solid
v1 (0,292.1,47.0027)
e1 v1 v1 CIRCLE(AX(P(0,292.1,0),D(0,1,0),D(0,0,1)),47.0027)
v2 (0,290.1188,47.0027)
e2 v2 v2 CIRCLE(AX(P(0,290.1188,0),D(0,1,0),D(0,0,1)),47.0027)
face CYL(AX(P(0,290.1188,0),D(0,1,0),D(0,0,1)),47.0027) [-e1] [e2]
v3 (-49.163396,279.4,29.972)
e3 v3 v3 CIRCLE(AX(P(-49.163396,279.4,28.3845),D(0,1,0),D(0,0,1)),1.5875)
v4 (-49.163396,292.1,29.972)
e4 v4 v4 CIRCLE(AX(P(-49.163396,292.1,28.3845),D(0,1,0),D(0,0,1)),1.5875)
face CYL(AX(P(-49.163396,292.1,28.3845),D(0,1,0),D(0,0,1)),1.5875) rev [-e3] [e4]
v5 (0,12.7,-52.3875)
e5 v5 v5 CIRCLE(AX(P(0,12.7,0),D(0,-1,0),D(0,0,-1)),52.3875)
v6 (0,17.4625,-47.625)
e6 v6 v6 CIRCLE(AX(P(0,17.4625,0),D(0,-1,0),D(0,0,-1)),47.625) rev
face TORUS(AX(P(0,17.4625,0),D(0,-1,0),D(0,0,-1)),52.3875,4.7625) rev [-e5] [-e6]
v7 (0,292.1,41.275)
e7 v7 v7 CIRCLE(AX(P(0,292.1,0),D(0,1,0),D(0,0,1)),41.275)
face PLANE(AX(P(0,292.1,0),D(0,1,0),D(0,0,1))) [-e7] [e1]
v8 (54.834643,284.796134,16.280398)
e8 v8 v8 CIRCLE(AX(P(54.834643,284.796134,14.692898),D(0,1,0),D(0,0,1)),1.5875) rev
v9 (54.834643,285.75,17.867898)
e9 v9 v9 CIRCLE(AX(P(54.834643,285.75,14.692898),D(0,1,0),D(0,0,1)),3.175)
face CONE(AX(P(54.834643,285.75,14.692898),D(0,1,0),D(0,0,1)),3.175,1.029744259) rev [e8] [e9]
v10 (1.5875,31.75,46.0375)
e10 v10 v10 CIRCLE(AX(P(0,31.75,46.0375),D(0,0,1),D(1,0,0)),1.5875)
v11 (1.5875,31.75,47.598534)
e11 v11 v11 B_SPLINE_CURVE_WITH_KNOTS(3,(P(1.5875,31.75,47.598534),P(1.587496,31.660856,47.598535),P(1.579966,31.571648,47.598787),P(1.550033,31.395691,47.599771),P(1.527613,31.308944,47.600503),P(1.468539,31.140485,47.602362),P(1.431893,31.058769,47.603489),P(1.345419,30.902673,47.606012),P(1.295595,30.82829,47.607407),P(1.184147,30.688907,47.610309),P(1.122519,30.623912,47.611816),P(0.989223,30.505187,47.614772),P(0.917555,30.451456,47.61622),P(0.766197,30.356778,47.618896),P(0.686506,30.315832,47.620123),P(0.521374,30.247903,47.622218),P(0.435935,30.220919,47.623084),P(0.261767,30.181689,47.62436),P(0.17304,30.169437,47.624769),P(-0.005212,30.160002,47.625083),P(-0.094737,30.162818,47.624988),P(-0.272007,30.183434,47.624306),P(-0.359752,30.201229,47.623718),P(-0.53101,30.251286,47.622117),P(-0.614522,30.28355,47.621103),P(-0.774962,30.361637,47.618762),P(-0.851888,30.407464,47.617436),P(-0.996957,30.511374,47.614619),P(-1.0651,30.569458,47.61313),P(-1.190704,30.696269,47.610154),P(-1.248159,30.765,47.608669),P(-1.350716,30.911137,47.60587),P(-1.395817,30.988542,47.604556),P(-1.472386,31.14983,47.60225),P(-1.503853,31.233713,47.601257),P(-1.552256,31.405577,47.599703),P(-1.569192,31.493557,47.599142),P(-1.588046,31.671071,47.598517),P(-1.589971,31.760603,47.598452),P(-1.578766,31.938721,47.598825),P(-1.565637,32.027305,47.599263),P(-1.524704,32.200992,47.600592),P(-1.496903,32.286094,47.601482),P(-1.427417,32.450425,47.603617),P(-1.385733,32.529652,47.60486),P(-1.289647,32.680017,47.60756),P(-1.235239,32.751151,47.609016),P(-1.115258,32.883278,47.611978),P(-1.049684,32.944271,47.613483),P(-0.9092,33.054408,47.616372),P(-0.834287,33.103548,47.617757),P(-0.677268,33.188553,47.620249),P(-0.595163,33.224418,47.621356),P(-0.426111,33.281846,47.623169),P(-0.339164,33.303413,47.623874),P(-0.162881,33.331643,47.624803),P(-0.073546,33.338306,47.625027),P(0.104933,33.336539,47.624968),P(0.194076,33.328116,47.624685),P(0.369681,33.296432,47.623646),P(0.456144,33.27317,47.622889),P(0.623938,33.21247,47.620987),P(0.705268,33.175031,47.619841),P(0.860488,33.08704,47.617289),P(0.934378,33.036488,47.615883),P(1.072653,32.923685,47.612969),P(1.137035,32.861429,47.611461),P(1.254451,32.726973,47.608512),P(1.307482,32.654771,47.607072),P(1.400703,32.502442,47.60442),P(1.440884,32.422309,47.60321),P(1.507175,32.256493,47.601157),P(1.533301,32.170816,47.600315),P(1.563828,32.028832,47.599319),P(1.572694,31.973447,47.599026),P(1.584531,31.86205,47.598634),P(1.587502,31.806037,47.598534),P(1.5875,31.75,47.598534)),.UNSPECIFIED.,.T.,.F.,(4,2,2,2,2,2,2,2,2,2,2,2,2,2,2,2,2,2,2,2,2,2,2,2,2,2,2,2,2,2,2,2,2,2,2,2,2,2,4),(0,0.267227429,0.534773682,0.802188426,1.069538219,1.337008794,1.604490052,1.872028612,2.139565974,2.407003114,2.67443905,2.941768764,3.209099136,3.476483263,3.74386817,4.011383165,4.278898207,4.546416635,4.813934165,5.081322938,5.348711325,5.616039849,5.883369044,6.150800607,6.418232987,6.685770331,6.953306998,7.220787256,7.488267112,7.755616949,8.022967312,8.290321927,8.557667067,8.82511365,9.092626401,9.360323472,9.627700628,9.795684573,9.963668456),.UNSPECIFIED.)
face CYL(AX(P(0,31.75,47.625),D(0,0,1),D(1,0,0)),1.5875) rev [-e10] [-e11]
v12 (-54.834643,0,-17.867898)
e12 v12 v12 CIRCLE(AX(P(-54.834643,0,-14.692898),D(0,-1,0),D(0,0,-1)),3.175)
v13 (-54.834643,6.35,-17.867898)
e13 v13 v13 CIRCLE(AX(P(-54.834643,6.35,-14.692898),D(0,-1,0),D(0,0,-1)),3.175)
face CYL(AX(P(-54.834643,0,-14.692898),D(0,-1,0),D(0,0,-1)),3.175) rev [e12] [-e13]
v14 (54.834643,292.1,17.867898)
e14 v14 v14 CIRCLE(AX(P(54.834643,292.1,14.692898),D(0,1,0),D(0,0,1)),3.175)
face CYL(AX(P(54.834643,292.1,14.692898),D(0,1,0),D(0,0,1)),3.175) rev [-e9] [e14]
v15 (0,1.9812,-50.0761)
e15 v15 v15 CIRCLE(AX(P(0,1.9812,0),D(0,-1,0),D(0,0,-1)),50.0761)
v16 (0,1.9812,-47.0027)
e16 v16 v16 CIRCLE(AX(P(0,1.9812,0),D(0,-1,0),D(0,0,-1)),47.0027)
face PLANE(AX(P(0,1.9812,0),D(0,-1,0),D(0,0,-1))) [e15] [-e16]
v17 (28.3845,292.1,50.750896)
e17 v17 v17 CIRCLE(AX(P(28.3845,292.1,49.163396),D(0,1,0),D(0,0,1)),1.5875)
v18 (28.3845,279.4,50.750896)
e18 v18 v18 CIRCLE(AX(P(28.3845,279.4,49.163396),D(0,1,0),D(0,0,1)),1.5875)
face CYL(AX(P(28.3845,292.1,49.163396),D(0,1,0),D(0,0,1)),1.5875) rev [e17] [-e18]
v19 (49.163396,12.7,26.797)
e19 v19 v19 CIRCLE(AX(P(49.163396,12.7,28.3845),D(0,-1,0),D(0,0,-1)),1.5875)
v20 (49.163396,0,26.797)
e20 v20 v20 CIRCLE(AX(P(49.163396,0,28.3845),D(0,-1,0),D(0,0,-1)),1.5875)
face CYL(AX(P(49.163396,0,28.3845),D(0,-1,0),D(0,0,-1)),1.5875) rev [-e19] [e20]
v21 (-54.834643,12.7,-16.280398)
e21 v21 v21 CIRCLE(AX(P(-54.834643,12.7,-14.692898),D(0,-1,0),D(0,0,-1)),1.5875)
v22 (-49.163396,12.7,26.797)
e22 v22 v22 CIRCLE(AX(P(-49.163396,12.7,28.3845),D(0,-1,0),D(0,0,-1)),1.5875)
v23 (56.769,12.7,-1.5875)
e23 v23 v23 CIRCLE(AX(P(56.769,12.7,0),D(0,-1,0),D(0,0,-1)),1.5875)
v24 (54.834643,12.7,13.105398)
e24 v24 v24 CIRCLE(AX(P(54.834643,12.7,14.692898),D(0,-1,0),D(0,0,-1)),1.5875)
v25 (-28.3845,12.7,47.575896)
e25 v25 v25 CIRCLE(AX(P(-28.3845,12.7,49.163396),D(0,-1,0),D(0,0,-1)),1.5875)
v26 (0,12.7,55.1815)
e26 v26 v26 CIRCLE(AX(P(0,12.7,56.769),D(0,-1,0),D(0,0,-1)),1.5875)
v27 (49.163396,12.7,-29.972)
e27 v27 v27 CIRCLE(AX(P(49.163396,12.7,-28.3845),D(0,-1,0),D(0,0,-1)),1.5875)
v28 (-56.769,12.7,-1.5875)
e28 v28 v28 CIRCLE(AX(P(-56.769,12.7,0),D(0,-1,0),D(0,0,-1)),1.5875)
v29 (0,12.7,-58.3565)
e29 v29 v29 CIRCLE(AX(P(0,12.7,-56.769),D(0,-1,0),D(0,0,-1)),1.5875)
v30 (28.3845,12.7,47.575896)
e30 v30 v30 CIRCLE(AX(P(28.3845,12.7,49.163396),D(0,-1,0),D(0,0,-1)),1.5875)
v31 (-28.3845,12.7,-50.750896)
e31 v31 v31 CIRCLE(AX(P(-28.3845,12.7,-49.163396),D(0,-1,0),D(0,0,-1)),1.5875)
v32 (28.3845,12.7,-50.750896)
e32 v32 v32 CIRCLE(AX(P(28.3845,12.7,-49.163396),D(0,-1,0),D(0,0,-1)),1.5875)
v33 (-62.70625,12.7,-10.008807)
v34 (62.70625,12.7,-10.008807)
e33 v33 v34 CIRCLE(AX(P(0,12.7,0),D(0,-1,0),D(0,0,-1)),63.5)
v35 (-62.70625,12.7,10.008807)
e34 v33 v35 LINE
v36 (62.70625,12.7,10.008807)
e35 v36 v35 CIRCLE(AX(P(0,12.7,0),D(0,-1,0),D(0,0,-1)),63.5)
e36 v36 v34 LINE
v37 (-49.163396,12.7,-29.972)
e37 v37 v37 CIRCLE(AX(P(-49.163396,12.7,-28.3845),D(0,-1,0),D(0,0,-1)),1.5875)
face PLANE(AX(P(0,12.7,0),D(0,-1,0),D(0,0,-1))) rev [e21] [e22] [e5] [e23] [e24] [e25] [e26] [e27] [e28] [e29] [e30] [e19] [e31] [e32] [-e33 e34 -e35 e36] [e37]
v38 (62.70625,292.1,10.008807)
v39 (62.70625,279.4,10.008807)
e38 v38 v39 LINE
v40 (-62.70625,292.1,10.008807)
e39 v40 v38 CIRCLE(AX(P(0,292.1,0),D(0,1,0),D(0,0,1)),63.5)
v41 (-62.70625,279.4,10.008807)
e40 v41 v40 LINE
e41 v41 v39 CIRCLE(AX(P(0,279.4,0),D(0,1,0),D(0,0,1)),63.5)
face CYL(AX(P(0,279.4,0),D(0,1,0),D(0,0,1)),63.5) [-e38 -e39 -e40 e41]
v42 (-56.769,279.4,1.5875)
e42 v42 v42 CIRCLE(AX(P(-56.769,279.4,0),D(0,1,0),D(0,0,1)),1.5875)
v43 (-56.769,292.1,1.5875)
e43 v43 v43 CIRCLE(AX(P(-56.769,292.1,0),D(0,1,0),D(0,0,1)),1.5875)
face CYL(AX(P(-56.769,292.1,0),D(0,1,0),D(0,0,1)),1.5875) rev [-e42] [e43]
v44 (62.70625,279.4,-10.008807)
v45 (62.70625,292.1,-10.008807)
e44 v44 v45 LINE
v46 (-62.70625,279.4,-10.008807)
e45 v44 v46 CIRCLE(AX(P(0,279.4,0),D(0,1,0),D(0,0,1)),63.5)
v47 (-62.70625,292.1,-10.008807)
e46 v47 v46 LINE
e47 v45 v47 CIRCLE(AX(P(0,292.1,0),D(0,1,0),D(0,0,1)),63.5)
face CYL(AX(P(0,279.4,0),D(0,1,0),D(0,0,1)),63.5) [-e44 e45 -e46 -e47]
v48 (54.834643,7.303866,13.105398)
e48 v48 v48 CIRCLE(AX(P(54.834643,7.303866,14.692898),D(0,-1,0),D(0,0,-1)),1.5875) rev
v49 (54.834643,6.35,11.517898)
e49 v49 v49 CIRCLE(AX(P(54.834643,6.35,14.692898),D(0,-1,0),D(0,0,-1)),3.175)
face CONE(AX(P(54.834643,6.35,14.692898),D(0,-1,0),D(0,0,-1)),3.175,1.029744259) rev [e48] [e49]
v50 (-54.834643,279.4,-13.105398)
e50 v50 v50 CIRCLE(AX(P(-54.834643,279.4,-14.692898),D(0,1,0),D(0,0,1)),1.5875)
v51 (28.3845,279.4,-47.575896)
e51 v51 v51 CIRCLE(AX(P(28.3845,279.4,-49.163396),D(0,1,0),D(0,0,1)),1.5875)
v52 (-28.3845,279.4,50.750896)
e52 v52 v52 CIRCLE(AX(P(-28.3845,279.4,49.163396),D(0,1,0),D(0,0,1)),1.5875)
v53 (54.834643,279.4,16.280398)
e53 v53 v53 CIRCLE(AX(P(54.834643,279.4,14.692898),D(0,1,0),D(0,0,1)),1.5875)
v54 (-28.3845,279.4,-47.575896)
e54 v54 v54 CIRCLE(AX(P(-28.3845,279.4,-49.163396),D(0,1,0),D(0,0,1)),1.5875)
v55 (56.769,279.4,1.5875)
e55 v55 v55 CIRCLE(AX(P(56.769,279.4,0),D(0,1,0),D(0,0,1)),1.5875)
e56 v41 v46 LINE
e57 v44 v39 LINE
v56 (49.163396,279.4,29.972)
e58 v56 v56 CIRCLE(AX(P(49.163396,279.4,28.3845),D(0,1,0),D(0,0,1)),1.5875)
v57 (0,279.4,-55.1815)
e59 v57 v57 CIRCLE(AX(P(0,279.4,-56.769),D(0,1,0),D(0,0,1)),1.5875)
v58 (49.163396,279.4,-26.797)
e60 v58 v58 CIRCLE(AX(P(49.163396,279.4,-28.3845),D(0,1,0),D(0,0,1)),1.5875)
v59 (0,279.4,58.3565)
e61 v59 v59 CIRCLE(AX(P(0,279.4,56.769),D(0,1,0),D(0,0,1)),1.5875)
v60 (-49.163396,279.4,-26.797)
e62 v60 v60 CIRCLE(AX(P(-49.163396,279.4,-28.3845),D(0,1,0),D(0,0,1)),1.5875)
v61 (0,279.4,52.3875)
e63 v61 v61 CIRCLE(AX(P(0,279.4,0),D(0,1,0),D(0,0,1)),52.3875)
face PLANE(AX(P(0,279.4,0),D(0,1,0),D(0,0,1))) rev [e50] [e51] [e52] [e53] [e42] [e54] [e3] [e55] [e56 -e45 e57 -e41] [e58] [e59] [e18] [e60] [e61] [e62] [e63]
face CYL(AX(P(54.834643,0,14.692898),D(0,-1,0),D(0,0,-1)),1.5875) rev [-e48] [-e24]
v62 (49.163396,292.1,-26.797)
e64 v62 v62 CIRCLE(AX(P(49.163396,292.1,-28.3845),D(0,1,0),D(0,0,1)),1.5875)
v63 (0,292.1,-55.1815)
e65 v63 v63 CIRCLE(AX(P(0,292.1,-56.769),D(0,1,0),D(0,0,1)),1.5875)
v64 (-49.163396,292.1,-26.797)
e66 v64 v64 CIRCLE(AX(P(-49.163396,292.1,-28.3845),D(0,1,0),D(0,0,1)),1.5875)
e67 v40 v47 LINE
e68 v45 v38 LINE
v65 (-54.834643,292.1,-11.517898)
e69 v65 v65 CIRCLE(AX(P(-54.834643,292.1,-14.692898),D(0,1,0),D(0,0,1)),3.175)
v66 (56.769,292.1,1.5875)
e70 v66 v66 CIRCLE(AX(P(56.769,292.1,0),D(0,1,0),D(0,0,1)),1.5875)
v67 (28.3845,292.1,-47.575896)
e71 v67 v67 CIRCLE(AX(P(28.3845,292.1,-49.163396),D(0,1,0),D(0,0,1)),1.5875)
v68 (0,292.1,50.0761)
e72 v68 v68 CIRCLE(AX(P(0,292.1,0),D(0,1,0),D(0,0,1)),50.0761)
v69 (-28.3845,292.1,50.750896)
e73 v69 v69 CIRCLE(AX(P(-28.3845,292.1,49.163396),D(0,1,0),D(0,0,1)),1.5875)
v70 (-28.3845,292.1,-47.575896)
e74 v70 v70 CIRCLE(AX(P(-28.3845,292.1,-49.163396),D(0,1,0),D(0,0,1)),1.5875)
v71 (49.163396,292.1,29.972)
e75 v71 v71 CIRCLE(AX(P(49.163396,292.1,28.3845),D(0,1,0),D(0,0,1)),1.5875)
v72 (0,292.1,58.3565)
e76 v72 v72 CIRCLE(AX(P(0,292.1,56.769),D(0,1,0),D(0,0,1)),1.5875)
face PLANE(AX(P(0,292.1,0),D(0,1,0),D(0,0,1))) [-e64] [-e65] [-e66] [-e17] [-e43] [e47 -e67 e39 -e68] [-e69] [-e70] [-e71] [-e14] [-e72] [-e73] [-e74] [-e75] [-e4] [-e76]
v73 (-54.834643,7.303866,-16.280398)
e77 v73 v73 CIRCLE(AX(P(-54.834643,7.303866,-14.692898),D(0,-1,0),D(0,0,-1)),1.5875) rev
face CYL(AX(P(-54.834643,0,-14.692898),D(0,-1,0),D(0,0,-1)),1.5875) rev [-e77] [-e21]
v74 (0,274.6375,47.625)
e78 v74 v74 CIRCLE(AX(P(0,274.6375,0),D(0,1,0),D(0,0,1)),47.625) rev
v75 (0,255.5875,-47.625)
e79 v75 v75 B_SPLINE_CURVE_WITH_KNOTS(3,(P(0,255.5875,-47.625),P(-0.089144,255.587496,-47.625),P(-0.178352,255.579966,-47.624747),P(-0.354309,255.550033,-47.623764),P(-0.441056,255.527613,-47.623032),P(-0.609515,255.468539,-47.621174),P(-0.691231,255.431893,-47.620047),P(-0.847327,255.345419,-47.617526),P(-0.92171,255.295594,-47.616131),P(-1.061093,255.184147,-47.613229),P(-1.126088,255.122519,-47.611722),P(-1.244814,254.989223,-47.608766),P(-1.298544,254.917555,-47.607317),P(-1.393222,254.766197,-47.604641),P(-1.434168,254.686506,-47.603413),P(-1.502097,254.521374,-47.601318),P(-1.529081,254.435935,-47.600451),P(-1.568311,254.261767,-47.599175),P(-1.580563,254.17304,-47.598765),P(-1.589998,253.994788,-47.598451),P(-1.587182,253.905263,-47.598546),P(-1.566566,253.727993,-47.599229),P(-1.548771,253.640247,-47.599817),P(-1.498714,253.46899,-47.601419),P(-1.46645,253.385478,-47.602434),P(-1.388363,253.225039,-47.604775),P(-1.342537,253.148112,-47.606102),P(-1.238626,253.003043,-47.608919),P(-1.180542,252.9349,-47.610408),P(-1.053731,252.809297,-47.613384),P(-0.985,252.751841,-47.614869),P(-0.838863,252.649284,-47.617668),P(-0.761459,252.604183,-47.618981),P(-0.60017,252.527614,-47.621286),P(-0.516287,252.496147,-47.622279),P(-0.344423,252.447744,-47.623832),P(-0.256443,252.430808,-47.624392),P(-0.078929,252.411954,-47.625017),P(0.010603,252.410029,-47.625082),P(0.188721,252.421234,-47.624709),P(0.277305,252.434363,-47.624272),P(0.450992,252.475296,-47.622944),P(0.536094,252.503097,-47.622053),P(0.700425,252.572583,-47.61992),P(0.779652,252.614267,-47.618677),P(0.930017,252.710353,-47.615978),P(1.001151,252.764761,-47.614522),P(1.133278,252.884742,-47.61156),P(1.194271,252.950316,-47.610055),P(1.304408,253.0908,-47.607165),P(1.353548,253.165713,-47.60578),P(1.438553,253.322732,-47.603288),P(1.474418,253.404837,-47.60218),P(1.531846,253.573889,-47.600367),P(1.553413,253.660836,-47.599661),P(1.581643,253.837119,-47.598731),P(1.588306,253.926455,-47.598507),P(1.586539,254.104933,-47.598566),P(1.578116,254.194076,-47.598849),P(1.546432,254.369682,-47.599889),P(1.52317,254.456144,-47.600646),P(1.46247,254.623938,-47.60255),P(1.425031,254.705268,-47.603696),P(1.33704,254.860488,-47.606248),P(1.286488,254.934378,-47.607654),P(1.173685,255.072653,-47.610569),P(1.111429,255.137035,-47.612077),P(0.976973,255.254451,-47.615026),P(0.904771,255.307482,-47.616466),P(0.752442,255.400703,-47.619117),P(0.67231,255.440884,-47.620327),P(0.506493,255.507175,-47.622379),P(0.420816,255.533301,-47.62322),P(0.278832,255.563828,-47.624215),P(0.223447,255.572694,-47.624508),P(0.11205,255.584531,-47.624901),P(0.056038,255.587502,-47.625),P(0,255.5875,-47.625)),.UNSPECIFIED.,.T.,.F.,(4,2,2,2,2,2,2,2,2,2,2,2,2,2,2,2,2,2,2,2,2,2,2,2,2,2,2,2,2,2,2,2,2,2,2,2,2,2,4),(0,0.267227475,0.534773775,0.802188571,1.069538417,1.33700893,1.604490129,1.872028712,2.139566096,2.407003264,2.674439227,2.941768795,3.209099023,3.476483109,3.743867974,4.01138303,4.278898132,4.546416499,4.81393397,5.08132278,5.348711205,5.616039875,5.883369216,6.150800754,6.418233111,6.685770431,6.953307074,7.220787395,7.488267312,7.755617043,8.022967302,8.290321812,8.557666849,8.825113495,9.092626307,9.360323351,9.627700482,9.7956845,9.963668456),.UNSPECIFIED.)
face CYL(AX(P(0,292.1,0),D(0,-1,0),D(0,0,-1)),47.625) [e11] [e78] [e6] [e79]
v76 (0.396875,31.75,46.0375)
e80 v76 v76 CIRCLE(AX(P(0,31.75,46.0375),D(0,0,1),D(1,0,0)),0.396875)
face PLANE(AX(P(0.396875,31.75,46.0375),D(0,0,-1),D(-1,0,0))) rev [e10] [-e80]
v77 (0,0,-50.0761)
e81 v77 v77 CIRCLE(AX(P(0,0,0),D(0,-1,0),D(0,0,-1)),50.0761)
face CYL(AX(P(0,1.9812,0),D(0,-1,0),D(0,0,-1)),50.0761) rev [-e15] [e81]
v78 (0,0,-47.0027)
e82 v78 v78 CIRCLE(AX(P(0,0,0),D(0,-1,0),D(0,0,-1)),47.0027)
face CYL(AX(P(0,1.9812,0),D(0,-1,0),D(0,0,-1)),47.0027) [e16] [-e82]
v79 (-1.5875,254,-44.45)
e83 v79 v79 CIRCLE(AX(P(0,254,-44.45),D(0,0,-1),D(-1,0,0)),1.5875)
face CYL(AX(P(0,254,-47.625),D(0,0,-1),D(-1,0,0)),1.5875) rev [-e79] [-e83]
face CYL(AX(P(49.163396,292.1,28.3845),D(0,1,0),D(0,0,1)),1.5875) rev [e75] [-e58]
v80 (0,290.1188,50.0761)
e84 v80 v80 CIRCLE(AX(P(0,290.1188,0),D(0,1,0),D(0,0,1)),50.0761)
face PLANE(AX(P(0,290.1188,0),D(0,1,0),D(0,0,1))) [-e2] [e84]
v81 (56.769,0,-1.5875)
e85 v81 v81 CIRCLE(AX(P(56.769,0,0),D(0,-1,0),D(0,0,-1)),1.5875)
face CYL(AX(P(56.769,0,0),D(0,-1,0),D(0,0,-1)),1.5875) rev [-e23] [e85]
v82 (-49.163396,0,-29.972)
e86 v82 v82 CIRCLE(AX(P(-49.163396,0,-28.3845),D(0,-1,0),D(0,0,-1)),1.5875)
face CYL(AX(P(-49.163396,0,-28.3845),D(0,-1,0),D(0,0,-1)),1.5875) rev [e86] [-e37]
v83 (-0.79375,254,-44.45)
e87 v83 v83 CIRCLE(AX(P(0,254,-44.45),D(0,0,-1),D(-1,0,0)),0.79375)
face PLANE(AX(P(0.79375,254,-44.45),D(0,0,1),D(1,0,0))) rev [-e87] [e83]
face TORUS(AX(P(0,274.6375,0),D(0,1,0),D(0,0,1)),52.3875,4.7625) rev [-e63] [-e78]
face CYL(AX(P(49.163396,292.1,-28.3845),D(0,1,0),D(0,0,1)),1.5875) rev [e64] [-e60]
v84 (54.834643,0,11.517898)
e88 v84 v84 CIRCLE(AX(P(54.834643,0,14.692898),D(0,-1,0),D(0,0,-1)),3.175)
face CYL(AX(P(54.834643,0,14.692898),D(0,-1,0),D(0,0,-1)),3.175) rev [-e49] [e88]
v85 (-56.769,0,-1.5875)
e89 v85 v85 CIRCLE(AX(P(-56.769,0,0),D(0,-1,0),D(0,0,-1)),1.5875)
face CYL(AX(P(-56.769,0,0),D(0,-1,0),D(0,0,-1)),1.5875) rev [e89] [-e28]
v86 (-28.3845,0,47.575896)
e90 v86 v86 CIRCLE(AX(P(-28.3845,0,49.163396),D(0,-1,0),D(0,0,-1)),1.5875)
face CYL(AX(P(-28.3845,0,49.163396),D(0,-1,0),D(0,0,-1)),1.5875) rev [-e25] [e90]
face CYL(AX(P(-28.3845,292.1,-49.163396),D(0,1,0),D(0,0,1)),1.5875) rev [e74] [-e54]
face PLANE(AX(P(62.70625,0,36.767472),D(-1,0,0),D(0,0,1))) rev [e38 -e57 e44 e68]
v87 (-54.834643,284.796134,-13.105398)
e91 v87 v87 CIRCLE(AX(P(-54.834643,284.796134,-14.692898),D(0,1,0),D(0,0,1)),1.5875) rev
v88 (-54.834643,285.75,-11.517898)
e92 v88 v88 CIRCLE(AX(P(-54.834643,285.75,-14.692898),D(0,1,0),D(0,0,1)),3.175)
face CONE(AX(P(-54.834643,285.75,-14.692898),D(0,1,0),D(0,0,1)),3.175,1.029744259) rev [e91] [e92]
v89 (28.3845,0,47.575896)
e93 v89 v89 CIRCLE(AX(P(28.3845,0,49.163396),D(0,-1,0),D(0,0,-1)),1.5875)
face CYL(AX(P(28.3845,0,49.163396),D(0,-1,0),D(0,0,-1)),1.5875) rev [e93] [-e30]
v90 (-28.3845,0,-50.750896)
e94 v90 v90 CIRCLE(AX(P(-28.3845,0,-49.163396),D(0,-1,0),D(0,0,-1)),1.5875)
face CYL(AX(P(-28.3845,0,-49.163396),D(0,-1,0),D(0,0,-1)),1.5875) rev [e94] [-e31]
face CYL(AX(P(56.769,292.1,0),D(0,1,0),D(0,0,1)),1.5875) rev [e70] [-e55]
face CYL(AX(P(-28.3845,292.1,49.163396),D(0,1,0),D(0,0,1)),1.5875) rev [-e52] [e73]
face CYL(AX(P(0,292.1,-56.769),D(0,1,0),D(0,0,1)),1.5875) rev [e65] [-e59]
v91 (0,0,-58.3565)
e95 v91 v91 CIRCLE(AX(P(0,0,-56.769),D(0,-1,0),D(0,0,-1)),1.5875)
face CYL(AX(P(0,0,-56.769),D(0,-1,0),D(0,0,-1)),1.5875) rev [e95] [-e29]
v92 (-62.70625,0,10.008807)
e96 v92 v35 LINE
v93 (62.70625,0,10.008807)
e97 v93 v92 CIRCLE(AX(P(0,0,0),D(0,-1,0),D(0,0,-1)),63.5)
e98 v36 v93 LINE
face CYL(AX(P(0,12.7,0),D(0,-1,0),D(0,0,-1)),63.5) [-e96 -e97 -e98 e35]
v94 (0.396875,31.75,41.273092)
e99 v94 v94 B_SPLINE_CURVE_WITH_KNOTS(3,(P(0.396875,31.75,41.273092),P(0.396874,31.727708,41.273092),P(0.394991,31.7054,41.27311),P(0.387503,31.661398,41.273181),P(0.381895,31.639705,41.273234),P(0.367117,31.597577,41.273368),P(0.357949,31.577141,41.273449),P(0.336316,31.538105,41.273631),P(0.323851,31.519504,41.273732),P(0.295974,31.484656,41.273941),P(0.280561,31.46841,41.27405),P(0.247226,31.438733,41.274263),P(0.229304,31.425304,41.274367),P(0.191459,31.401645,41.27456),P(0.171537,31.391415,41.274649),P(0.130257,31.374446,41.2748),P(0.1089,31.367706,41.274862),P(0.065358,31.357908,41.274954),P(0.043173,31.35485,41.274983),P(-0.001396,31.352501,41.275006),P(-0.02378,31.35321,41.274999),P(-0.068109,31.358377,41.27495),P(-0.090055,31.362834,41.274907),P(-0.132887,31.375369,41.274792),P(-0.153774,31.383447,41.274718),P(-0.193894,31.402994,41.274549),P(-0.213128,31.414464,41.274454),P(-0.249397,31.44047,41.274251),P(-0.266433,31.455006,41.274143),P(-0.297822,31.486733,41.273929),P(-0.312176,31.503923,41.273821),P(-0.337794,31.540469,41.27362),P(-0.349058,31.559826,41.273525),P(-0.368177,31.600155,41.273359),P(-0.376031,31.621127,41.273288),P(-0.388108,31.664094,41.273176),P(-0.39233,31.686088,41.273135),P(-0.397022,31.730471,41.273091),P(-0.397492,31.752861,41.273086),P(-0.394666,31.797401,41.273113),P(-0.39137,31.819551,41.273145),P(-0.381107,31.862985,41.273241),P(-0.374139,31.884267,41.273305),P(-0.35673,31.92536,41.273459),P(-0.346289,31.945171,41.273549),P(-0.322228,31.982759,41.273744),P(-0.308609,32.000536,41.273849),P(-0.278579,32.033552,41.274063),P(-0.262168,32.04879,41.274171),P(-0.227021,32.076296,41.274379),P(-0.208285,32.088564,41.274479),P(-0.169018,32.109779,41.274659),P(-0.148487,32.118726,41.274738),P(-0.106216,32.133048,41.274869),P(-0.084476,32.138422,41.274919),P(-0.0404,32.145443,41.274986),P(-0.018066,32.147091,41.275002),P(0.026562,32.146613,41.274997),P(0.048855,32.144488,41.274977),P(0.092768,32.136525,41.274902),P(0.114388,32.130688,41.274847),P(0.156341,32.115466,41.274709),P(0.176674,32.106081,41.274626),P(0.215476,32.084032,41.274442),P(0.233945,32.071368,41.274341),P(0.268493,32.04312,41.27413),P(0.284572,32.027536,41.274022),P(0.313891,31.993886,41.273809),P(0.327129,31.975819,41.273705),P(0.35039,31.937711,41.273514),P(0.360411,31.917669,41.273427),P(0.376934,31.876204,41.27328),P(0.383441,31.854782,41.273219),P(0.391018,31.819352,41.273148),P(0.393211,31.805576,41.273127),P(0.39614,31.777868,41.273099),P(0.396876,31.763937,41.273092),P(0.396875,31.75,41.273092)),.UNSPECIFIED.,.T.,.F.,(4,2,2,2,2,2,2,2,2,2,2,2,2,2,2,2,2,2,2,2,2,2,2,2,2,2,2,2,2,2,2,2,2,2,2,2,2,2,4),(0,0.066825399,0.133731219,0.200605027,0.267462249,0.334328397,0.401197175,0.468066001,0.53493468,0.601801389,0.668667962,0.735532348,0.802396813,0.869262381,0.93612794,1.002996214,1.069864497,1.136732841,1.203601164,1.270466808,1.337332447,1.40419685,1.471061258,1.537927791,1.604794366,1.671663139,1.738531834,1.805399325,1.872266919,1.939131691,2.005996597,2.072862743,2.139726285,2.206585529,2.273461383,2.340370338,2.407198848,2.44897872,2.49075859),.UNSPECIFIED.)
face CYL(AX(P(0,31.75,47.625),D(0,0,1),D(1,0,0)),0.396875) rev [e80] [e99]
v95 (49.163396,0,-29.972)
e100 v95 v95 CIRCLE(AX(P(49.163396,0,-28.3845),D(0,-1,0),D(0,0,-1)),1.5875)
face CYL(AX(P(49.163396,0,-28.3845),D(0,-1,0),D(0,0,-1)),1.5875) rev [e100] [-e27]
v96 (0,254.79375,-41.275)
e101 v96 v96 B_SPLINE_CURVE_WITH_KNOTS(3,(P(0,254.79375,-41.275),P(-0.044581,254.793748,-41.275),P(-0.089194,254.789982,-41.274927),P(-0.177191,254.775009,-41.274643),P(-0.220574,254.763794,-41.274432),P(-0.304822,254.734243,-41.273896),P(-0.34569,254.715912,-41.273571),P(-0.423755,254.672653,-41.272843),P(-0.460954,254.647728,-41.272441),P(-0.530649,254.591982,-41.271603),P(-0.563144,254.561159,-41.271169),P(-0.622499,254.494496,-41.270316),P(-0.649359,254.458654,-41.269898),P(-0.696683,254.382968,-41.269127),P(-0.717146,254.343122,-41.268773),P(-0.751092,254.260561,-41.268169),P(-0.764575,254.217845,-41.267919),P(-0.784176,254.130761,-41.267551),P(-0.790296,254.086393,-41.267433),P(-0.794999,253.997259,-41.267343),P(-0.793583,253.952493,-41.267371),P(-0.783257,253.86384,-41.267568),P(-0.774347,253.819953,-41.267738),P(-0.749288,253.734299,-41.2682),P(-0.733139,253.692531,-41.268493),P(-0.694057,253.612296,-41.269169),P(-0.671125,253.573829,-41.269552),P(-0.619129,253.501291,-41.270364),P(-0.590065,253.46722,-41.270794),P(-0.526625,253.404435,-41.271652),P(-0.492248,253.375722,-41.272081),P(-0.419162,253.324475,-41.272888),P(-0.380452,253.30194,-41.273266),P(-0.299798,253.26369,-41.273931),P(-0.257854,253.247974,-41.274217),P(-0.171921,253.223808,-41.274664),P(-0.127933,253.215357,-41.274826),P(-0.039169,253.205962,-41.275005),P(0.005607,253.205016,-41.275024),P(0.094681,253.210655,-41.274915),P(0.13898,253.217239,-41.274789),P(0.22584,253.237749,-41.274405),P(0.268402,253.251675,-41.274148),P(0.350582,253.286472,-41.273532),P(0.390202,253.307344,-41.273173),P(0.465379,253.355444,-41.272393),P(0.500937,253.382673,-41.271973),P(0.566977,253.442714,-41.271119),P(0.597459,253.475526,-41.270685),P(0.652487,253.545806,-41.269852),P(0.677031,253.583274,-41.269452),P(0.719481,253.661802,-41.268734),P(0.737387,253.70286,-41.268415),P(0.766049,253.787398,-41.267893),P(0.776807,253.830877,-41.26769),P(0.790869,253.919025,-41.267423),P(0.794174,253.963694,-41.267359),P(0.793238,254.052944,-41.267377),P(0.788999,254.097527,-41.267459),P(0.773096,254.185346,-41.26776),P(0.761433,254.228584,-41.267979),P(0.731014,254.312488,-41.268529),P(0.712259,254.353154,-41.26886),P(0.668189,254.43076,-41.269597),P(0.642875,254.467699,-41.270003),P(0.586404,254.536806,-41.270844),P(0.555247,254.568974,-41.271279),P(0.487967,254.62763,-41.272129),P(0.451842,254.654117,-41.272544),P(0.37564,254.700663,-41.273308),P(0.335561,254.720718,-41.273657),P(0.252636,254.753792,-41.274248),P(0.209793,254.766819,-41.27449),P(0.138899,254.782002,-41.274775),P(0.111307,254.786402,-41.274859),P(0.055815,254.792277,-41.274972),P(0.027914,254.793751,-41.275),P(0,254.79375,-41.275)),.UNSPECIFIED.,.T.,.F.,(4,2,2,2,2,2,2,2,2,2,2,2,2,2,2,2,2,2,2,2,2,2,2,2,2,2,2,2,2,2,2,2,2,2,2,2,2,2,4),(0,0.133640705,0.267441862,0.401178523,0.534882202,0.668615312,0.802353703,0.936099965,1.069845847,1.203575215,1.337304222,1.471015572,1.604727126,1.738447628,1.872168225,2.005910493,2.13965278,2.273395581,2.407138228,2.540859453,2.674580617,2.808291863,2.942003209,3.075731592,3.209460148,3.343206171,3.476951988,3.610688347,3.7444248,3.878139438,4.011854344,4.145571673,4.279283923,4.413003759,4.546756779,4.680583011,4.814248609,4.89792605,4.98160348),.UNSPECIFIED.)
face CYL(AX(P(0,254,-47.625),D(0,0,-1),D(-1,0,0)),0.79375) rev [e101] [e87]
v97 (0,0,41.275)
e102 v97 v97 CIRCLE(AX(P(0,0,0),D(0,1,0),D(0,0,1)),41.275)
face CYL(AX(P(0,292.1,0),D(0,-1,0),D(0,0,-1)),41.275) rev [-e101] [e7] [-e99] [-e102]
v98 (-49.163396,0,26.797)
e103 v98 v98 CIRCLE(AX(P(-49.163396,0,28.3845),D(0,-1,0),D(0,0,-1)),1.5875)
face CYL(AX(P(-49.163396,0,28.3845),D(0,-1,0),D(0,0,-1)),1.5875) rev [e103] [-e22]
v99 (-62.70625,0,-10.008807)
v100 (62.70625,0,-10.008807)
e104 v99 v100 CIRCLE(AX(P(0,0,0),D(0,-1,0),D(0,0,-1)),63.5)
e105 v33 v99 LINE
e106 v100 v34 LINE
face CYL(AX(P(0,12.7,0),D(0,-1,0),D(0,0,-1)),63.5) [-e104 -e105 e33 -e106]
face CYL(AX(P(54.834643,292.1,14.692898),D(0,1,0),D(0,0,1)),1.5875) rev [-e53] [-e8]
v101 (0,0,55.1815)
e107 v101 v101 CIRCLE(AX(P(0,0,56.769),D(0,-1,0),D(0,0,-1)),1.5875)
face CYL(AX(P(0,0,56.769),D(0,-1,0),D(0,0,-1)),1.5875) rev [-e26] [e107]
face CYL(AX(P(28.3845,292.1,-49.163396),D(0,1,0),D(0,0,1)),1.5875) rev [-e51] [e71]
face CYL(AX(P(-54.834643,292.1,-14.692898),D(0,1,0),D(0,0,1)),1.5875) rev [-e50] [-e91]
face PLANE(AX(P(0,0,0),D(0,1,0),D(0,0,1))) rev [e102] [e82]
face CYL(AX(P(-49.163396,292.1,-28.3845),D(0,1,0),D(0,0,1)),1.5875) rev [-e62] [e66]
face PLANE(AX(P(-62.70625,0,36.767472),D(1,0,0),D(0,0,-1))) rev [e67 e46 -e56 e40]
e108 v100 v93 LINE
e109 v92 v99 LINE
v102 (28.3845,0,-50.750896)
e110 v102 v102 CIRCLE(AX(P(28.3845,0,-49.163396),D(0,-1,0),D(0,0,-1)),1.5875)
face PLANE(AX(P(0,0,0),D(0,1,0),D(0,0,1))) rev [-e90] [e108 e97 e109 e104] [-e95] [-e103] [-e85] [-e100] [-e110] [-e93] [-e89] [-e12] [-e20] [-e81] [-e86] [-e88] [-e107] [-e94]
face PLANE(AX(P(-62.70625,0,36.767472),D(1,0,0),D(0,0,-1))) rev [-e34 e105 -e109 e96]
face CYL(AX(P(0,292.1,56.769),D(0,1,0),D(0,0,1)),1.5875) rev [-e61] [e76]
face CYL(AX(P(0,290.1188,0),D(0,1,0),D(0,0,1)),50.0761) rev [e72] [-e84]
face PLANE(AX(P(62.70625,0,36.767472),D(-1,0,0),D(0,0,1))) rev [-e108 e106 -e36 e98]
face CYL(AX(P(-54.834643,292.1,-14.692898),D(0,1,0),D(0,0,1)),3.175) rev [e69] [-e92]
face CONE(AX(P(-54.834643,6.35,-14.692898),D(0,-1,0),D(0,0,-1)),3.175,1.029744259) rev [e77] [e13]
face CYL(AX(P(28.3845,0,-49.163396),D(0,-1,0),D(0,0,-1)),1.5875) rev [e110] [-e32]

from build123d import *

# Parameters (mm, degrees)
SKETCH2_R                               = 47.625
SKETCH2_R_2                             = 41.275
BASE_CYLINDER_DEPTH                     = 292.1
SKETCH3_R                               = 63.5
SKETCH3_R_2                             = 41.275
AFT_FLANGE_DEPTH                        = 12.7
FORWARD_START                           = -12.7
SKETCH4_R                               = 63.5
SKETCH4_R_2                             = 41.275
FORWARD_FLANGE_DEPTH                    = 12.7
SKETCH6_R                               = 50.0761
SKETCH6_R_2                             = 47.0027
AFT_O_RING_DEPTH                        = 1.9812
FORWARD_START_2                         = -1.9812
SKETCH7_R                               = 50.0761
SKETCH7_R_2                             = 47.0027
FORWARD_O_RING_DEPTH                    = 1.9812
F_1_8_0_125_DIAMETER_HOLE2_AT_2_COUNT   = 2
F_1_8_0_125_DIAMETER_HOLE2_AT_2_PITCH   = 29.385796743
F_1_8_0_125_DIAMETER_HOLE2_AT_3_COUNT   = 2
F_1_8_0_125_DIAMETER_HOLE2_AT_3_PITCH   = 56.769
F_1_8_0_125_DIAMETER_HOLE2_AT_4_COUNT   = 2
F_1_8_0_125_DIAMETER_HOLE2_AT_4_PITCH   = 80.283489722
F_1_8_0_125_DIAMETER_HOLE2_AT_5_COUNT   = 2
F_1_8_0_125_DIAMETER_HOLE2_AT_5_PITCH   = 98.326792295
F_1_8_0_125_DIAMETER_HOLE2_AT_6_COUNT   = 2
F_1_8_0_125_DIAMETER_HOLE2_AT_6_PITCH   = 109.669286465
F_1_8_0_125_DIAMETER_HOLE2_AT_7_COUNT   = 2
F_1_8_0_125_DIAMETER_HOLE2_AT_7_PITCH   = 113.538
F_1_8_0_125_DIAMETER_HOLE2_AT_8_COUNT   = 2
F_1_8_0_125_DIAMETER_HOLE2_AT_8_PITCH   = 109.669286465
F_1_8_0_125_DIAMETER_HOLE2_AT_9_COUNT   = 2
F_1_8_0_125_DIAMETER_HOLE2_AT_9_PITCH   = 98.326792295
F_1_8_0_125_DIAMETER_HOLE2_AT_10_COUNT  = 2
F_1_8_0_125_DIAMETER_HOLE2_AT_10_PITCH  = 80.283489722
F_1_8_0_125_DIAMETER_HOLE2_AT_11_COUNT  = 2
F_1_8_0_125_DIAMETER_HOLE2_AT_11_PITCH  = 56.769
F_1_8_0_125_DIAMETER_HOLE2_AT_12_COUNT  = 2
F_1_8_0_125_DIAMETER_HOLE2_AT_12_PITCH  = 29.385796743
FLANGE_FILLET_R                         = 4.7625
F_1_4_0_25_PRESS_DOWEL_HOLE1_AT_2_COUNT = 2
F_1_4_0_25_PRESS_DOWEL_HOLE1_AT_2_PITCH = 113.538
F_1_8_0_125_DIAMETER_HOLE4_REACH        = 307.593
F_1_8_0_125_DIAMETER_HOLE4_BORE_R       = 1.5875
PRESSURETAP1_START                      = 46.0375
PRESSURETAP1_OUTLINE_R                  = 1.5875
PRESSURETAP1_DEPTH                      = 1.587500078
PRESSURETAP1_START_2                    = 41.273091803
PRESSURETAP1_2_OUTLINE_R                = 0.396875
PRESSURETAP1_2_DEPTH                    = 4.764408197
PRESSURETAP2_START                      = -47.6250001
PRESSURETAP2_OUTLINE_R                  = 1.5875
PRESSURETAP2_DEPTH                      = 3.1750001
PRESSURETAP2_START_2                    = -44.45
PRESSURETAP2_2_OUTLINE_R                = 0.79375
PRESSURETAP2_2_DEPTH                    = 3.18263301
MILLGRIPS_DEPTH                         = 306.59271925
MILLGRIPS_DEPTH_BACK                    = 306.59271925
SKETCH32_W                              = 1.5875
SKETCH32_H                              = 73.534943204


# Read off the part's stored shape, not the designer's step: PressureTap1, PressureTap2
with BuildPart() as part:
    # Sketch2 → Base Cylinder (new body)
    with BuildSketch(Plane(origin=(0, 0, 0), x_dir=(1, 0, 0), z_dir=(0, 1, 0))):
        with Locations(Location((0, 0, 0), (0, 0, 270))):
            Circle(SKETCH2_R)
        with Locations(Location((0, 0, 0), (0, 0, 270))):
            Circle(SKETCH2_R_2, mode=Mode.SUBTRACT)
    extrude(amount=BASE_CYLINDER_DEPTH)

    # Sketch3 → Aft Flange (add)
    with BuildSketch(Plane.XZ):
        with Locations(Location((0, 0, 0), (0, 0, 270))):
            Circle(SKETCH3_R)
        with Locations(Location((0, 0, 0), (0, 0, 90))):
            Circle(SKETCH3_R_2, mode=Mode.SUBTRACT)
    extrude(amount=-AFT_FLANGE_DEPTH)

    # Sketch4 → Forward Flange (add)
    with BuildSketch(Plane(origin=(0, 292.1, 0), x_dir=(1, 0, 0), z_dir=(0, 1, 0)).offset(FORWARD_START)):
        with Locations(Location((0, 0, 0), (0, 0, 90))):
            Circle(SKETCH4_R)
        with Locations(Location((0, 0, 0), (0, 0, 270))):
            Circle(SKETCH4_R_2, mode=Mode.SUBTRACT)
    extrude(amount=FORWARD_FLANGE_DEPTH)

    # Sketch6 → Aft O-Ring (cut)
    with BuildSketch(Plane.XZ):
        with Locations(Location((0, 0, 0), (0, 0, 270))):
            Circle(SKETCH6_R)
        with Locations(Location((0, 0, 0), (0, 0, 270))):
            Circle(SKETCH6_R_2, mode=Mode.SUBTRACT)
    extrude(amount=-AFT_O_RING_DEPTH, mode=Mode.SUBTRACT)

    # Sketch7 → Forward O-Ring (cut)
    with BuildSketch(Plane(origin=(0, 292.1, 0), x_dir=(1, 0, 0), z_dir=(0, 1, 0)).offset(FORWARD_START_2)):
        with Locations(Location((0, 0, 0), (0, 0, 90))):
            Circle(SKETCH7_R)
        with Locations(Location((0, 0, 0), (0, 0, 90))):
            Circle(SKETCH7_R_2, mode=Mode.SUBTRACT)
    extrude(amount=FORWARD_O_RING_DEPTH, mode=Mode.SUBTRACT)

    # Sketch9 → 1/8 (0.125) Diameter Hole2 (revolve, cut)
    with BuildSketch(Plane(origin=(28.3845, 0, 49.163396147), x_dir=(0, 0, -1), z_dir=(1, 0, 0))):
        Polygon((0, 0), (0, 26.353866233), (1.5875, 25.4), (1.5875, 0), align=None)
    f_1_8_0_125_diameter_hole2 = revolve(axis=Axis((28.3845, -6.35, 49.163396147), (0, 1, 0)), mode=Mode.SUBTRACT)

    # 1/8 (0.125) Diameter Hole2 at 2: 1/8 (0.125) Diameter Hole2 ×2
    with Locations(*[Vector(0.7071067811865477, 0, -0.7071067811865475) * (i * F_1_8_0_125_DIAMETER_HOLE2_AT_2_PITCH) for i in range(1, F_1_8_0_125_DIAMETER_HOLE2_AT_2_COUNT)]):
        add(f_1_8_0_125_diameter_hole2, mode=Mode.SUBTRACT)

    # 1/8 (0.125) Diameter Hole2 at 3: 1/8 (0.125) Diameter Hole2 ×2
    with Locations(*[Vector(0.5000000000000002, 0, -0.8660254037844386) * (i * F_1_8_0_125_DIAMETER_HOLE2_AT_3_PITCH) for i in range(1, F_1_8_0_125_DIAMETER_HOLE2_AT_3_COUNT)]):
        add(f_1_8_0_125_diameter_hole2, mode=Mode.SUBTRACT)

    # 1/8 (0.125) Diameter Hole2 at 4: 1/8 (0.125) Diameter Hole2 ×2
    with Locations(*[Vector(0.2588190451025211, 0, -0.9659258262890682) * (i * F_1_8_0_125_DIAMETER_HOLE2_AT_4_PITCH) for i in range(1, F_1_8_0_125_DIAMETER_HOLE2_AT_4_COUNT)]):
        add(f_1_8_0_125_diameter_hole2, mode=Mode.SUBTRACT)

    # 1/8 (0.125) Diameter Hole2 at 5: 1/8 (0.125) Diameter Hole2 ×2
    with Locations(*[(0, 0, -i * F_1_8_0_125_DIAMETER_HOLE2_AT_5_PITCH) for i in range(1, F_1_8_0_125_DIAMETER_HOLE2_AT_5_COUNT)]):
        add(f_1_8_0_125_diameter_hole2, mode=Mode.SUBTRACT)

    # 1/8 (0.125) Diameter Hole2 at 6: 1/8 (0.125) Diameter Hole2 ×2
    with Locations(*[Vector(-0.2588190451025206, 0, -0.9659258262890684) * (i * F_1_8_0_125_DIAMETER_HOLE2_AT_6_PITCH) for i in range(1, F_1_8_0_125_DIAMETER_HOLE2_AT_6_COUNT)]):
        add(f_1_8_0_125_diameter_hole2, mode=Mode.SUBTRACT)

    # 1/8 (0.125) Diameter Hole2 at 7: 1/8 (0.125) Diameter Hole2 ×2
    with Locations(*[Vector(-0.4999999999999996, 0, -0.8660254037844389) * (i * F_1_8_0_125_DIAMETER_HOLE2_AT_7_PITCH) for i in range(1, F_1_8_0_125_DIAMETER_HOLE2_AT_7_COUNT)]):
        add(f_1_8_0_125_diameter_hole2, mode=Mode.SUBTRACT)

    # 1/8 (0.125) Diameter Hole2 at 8: 1/8 (0.125) Diameter Hole2 ×2
    with Locations(*[Vector(-0.7071067811865474, 0, -0.7071067811865478) * (i * F_1_8_0_125_DIAMETER_HOLE2_AT_8_PITCH) for i in range(1, F_1_8_0_125_DIAMETER_HOLE2_AT_8_COUNT)]):
        add(f_1_8_0_125_diameter_hole2, mode=Mode.SUBTRACT)

    # 1/8 (0.125) Diameter Hole2 at 9: 1/8 (0.125) Diameter Hole2 ×2
    with Locations(*[Vector(-0.8660254037844386, 0, -0.5000000000000001) * (i * F_1_8_0_125_DIAMETER_HOLE2_AT_9_PITCH) for i in range(1, F_1_8_0_125_DIAMETER_HOLE2_AT_9_COUNT)]):
        add(f_1_8_0_125_diameter_hole2, mode=Mode.SUBTRACT)

    # 1/8 (0.125) Diameter Hole2 at 10: 1/8 (0.125) Diameter Hole2 ×2
    with Locations(*[Vector(-0.9659258262890683, 0, -0.2588190451025209) * (i * F_1_8_0_125_DIAMETER_HOLE2_AT_10_PITCH) for i in range(1, F_1_8_0_125_DIAMETER_HOLE2_AT_10_COUNT)]):
        add(f_1_8_0_125_diameter_hole2, mode=Mode.SUBTRACT)

    # 1/8 (0.125) Diameter Hole2 at 11: 1/8 (0.125) Diameter Hole2 ×2
    with Locations(*[(-i * F_1_8_0_125_DIAMETER_HOLE2_AT_11_PITCH, 0, 0) for i in range(1, F_1_8_0_125_DIAMETER_HOLE2_AT_11_COUNT)]):
        add(f_1_8_0_125_diameter_hole2, mode=Mode.SUBTRACT)

    # 1/8 (0.125) Diameter Hole2 at 12: 1/8 (0.125) Diameter Hole2 ×2
    with Locations(*[Vector(-0.9659258262890684, 0, 0.2588190451025204) * (i * F_1_8_0_125_DIAMETER_HOLE2_AT_12_PITCH) for i in range(1, F_1_8_0_125_DIAMETER_HOLE2_AT_12_COUNT)]):
        add(f_1_8_0_125_diameter_hole2, mode=Mode.SUBTRACT)

    # Flange Fillet
    flange_fillet_edges = [part.edges().sort_by_distance(p)[0] for p in [
        (0, 12.7, -47.625),
        (0, 279.4, -47.625),
    ]]
    fillet(flange_fillet_edges, radius=FLANGE_FILLET_R)

    # Sketch12 → 1/4 (0.25) Press Dowel Hole1 (revolve, cut)
    with BuildSketch(Plane(origin=(-54.834643233, 0, -14.692898371), x_dir=(0, 0, -1), z_dir=(1, 0, 0))):
        Polygon((0, 0), (0, 8.257732465), (3.175, 6.35), (3.175, 0), align=None)
    f_1_4_0_25_press_dowel_hole1 = revolve(axis=Axis((-54.834643233, -6.35, -14.692898371), (0, 1, 0)), mode=Mode.SUBTRACT)

    # 1/4 (0.25) Press Dowel Hole1 at 2: 1/4 (0.25) Press Dowel Hole1 ×2
    with Locations(*[Vector(0.9659258262890678, 0, 0.2588190451025227) * (i * F_1_4_0_25_PRESS_DOWEL_HOLE1_AT_2_PITCH) for i in range(1, F_1_4_0_25_PRESS_DOWEL_HOLE1_AT_2_COUNT)]):
        add(f_1_4_0_25_press_dowel_hole1, mode=Mode.SUBTRACT)

    # 1/8 (0.125) Diameter Hole4 bore → 1/8 (0.125) Diameter Hole4 (cut, up to next)
    with BuildSketch(Plane(origin=(0, 0, 0), x_dir=(-1, 0, 0), z_dir=(0, -1, 0)), mode=Mode.PRIVATE) as f_1_8_0_125_diameter_hole4_sk1:
        with Locations((-54.834643233, -14.692898371)):
            Circle(F_1_8_0_125_DIAMETER_HOLE4_BORE_R)
    f_1_8_0_125_diameter_hole4_tool1 = extrude(f_1_8_0_125_diameter_hole4_sk1.sketch, amount=-F_1_8_0_125_DIAMETER_HOLE4_REACH, mode=Mode.PRIVATE) & part.part
    # 1/8 (0.125) Diameter Hole4 bore → 1/8 (0.125) Diameter Hole4 (cut, up to next)
    with BuildSketch(Plane(origin=(0, 0, 0), x_dir=(-1, 0, 0), z_dir=(0, -1, 0)), mode=Mode.PRIVATE) as f_1_8_0_125_diameter_hole4_sk2:
        with Locations((54.834643233, 14.692898371)):
            Circle(F_1_8_0_125_DIAMETER_HOLE4_BORE_R)
    f_1_8_0_125_diameter_hole4_tool2 = extrude(f_1_8_0_125_diameter_hole4_sk2.sketch, amount=-F_1_8_0_125_DIAMETER_HOLE4_REACH, mode=Mode.PRIVATE) & part.part
    f_1_8_0_125_diameter_hole4_1 = f_1_8_0_125_diameter_hole4_tool1.solids().sort_by_distance((54.834643, 0, 14.692898))[0]
    add(f_1_8_0_125_diameter_hole4_1, mode=Mode.SUBTRACT)
    f_1_8_0_125_diameter_hole4_2 = f_1_8_0_125_diameter_hole4_tool2.solids().sort_by_distance((-54.834643, 0, -14.692898))[0]
    add(f_1_8_0_125_diameter_hole4_2, mode=Mode.SUBTRACT)
    f_1_8_0_125_diameter_hole4 = f_1_8_0_125_diameter_hole4_1 + f_1_8_0_125_diameter_hole4_2  # 1/8 (0.125) Diameter Hole4 as one shape, for the pattern or mirror that repeats it

    # Forward Mirror BC and Pin: 1/8 (0.125) Diameter Hole2, 1/4 (0.25) Press Dowel Hole1, 1/8 (0.125) Diameter Hole4 across plane
    add(f_1_8_0_125_diameter_hole2.mirror(Plane.ZX.offset(146.05)), mode=Mode.SUBTRACT)
    add(f_1_4_0_25_press_dowel_hole1.mirror(Plane.ZX.offset(146.05)), mode=Mode.SUBTRACT)
    add(f_1_8_0_125_diameter_hole4.mirror(Plane.ZX.offset(146.05)), mode=Mode.SUBTRACT)

    # Forward Mirror BC and Pin copy 1 sketch → Forward Mirror BC and Pin copy 1 (revolve, cut)
    with BuildSketch(Plane(origin=(49.163396147, 292.1, 28.3845), x_dir=(0, 0, -1), z_dir=(1, 0, 0))):
        Polygon((0, 0), (0, -26.353866233), (1.5875, -25.4), (1.5875, 0), align=None)
    revolve(axis=Axis((49.163396147, 298.45, 28.3845), (0, 1, 0)), mode=Mode.SUBTRACT)

    # Forward Mirror BC and Pin copy 2 sketch → Forward Mirror BC and Pin copy 2 (revolve, cut)
    with BuildSketch(Plane(origin=(56.769, 292.1, 0), x_dir=(0, 0, -1), z_dir=(1, 0, 0))):
        Polygon((0, 0), (0, -26.353866233), (1.5875, -25.4), (1.5875, 0), align=None)
    revolve(axis=Axis((56.769, 298.45, 0), (0, 1, 0)), mode=Mode.SUBTRACT)

    # Forward Mirror BC and Pin copy 3 sketch → Forward Mirror BC and Pin copy 3 (revolve, cut)
    with BuildSketch(Plane(origin=(49.163396147, 292.1, -28.3845), x_dir=(0, 0, -1), z_dir=(1, 0, 0))):
        Polygon((0, 0), (0, -26.353866233), (1.5875, -25.4), (1.5875, 0), align=None)
    revolve(axis=Axis((49.163396147, 298.45, -28.3845), (0, 1, 0)), mode=Mode.SUBTRACT)

    # Forward Mirror BC and Pin copy 4 sketch → Forward Mirror BC and Pin copy 4 (revolve, cut)
    with BuildSketch(Plane(origin=(28.3845, 292.1, -49.163396147), x_dir=(0, 0, -1), z_dir=(1, 0, 0))):
        Polygon((0, 0), (0, -26.353866233), (1.5875, -25.4), (1.5875, 0), align=None)
    revolve(axis=Axis((28.3845, 298.45, -49.163396147), (0, 1, 0)), mode=Mode.SUBTRACT)

    # Forward Mirror BC and Pin copy 5 sketch → Forward Mirror BC and Pin copy 5 (revolve, cut)
    with BuildSketch(Plane(origin=(0, 292.1, -56.769), x_dir=(0, 0, -1), z_dir=(1, 0, 0))):
        Polygon((0, 0), (0, -26.353866233), (1.5875, -25.4), (1.5875, 0), align=None)
    revolve(axis=Axis((0, 298.45, -56.769), (0, 1, 0)), mode=Mode.SUBTRACT)

    # Forward Mirror BC and Pin copy 6 sketch → Forward Mirror BC and Pin copy 6 (revolve, cut)
    with BuildSketch(Plane(origin=(-28.3845, 292.1, -49.163396147), x_dir=(0, 0, -1), z_dir=(1, 0, 0))):
        Polygon((0, 0), (0, -26.353866233), (1.5875, -25.4), (1.5875, 0), align=None)
    revolve(axis=Axis((-28.3845, 298.45, -49.163396147), (0, 1, 0)), mode=Mode.SUBTRACT)

    # Forward Mirror BC and Pin copy 7 sketch → Forward Mirror BC and Pin copy 7 (revolve, cut)
    with BuildSketch(Plane(origin=(-49.163396147, 292.1, -28.3845), x_dir=(0, 0, -1), z_dir=(1, 0, 0))):
        Polygon((0, 0), (0, -26.353866233), (1.5875, -25.4), (1.5875, 0), align=None)
    revolve(axis=Axis((-49.163396147, 298.45, -28.3845), (0, 1, 0)), mode=Mode.SUBTRACT)

    # Forward Mirror BC and Pin copy 8 sketch → Forward Mirror BC and Pin copy 8 (revolve, cut)
    with BuildSketch(Plane(origin=(-56.769, 292.1, 0), x_dir=(0, 0, -1), z_dir=(1, 0, 0))):
        Polygon((0, 0), (0, -26.353866233), (1.5875, -25.4), (1.5875, 0), align=None)
    revolve(axis=Axis((-56.769, 298.45, 0), (0, 1, 0)), mode=Mode.SUBTRACT)

    # Forward Mirror BC and Pin copy 9 sketch → Forward Mirror BC and Pin copy 9 (revolve, cut)
    with BuildSketch(Plane(origin=(-49.163396147, 292.1, 28.3845), x_dir=(0, 0, -1), z_dir=(1, 0, 0))):
        Polygon((0, 0), (0, -26.353866233), (1.5875, -25.4), (1.5875, 0), align=None)
    revolve(axis=Axis((-49.163396147, 298.45, 28.3845), (0, 1, 0)), mode=Mode.SUBTRACT)

    # Forward Mirror BC and Pin copy 10 sketch → Forward Mirror BC and Pin copy 10 (revolve, cut)
    with BuildSketch(Plane(origin=(-28.3845, 292.1, 49.163396147), x_dir=(0, 0, -1), z_dir=(1, 0, 0))):
        Polygon((0, 0), (0, -26.353866233), (1.5875, -25.4), (1.5875, 0), align=None)
    revolve(axis=Axis((-28.3845, 298.45, 49.163396147), (0, 1, 0)), mode=Mode.SUBTRACT)

    # Forward Mirror BC and Pin copy 11 sketch → Forward Mirror BC and Pin copy 11 (revolve, cut)
    with BuildSketch(Plane(origin=(0, 292.1, 56.769), x_dir=(0, 0, -1), z_dir=(1, 0, 0))):
        Polygon((0, 0), (0, -26.353866233), (1.5875, -25.4), (1.5875, 0), align=None)
    revolve(axis=Axis((0, 298.45, 56.769), (0, 1, 0)), mode=Mode.SUBTRACT)

    # Forward Mirror BC and Pin copy 12 sketch → Forward Mirror BC and Pin copy 12 (revolve, cut)
    with BuildSketch(Plane(origin=(54.834643233, 292.1, 14.692898371), x_dir=(0, 0, -1), z_dir=(1, 0, 0))):
        Polygon((0, 0), (0, -8.257732465), (3.175, -6.35), (3.175, 0), align=None)
    revolve(axis=Axis((54.834643233, 298.45, 14.692898371), (0, 1, 0)), mode=Mode.SUBTRACT)

    # PressureTap1 outline → PressureTap1 (cut)
    with BuildSketch(Plane.XY.offset(PRESSURETAP1_START)):
        with Locations((0, 31.75)):
            Circle(PRESSURETAP1_OUTLINE_R)
    extrude(amount=PRESSURETAP1_DEPTH, mode=Mode.SUBTRACT)

    # PressureTap1 2 outline → PressureTap1 2 (cut)
    with BuildSketch(Plane.XY.offset(PRESSURETAP1_START_2)):
        with Locations((0, 31.75)):
            Circle(PRESSURETAP1_2_OUTLINE_R)
    extrude(amount=PRESSURETAP1_2_DEPTH, mode=Mode.SUBTRACT)

    # PressureTap2 outline → PressureTap2 (cut)
    with BuildSketch(Plane.XY.offset(PRESSURETAP2_START)):
        with Locations((0, 254)):
            Circle(PRESSURETAP2_OUTLINE_R)
    extrude(amount=PRESSURETAP2_DEPTH, mode=Mode.SUBTRACT)

    # PressureTap2 2 outline → PressureTap2 2 (cut)
    with BuildSketch(Plane.XY.offset(PRESSURETAP2_START_2)):
        with Locations((0, 254)):
            Circle(PRESSURETAP2_2_OUTLINE_R)
    extrude(amount=PRESSURETAP2_2_DEPTH, mode=Mode.SUBTRACT)

    # Sketch32 → MillGrips (cut, two sides: drawn at the far end of the back side and taken through both)
    with BuildSketch(Plane(origin=(0, 292.1, 0), x_dir=(1, 0, 0), z_dir=(0, 1, 0)).offset(-MILLGRIPS_DEPTH_BACK)):
        with Locations((-63.5, 0)):
            Rectangle(SKETCH32_W, SKETCH32_H)
        with Locations((63.5, 0)):
            Rectangle(SKETCH32_W, SKETCH32_H)
    extrude(amount=MILLGRIPS_DEPTH + MILLGRIPS_DEPTH_BACK, mode=Mode.SUBTRACT)


solid = part.part
